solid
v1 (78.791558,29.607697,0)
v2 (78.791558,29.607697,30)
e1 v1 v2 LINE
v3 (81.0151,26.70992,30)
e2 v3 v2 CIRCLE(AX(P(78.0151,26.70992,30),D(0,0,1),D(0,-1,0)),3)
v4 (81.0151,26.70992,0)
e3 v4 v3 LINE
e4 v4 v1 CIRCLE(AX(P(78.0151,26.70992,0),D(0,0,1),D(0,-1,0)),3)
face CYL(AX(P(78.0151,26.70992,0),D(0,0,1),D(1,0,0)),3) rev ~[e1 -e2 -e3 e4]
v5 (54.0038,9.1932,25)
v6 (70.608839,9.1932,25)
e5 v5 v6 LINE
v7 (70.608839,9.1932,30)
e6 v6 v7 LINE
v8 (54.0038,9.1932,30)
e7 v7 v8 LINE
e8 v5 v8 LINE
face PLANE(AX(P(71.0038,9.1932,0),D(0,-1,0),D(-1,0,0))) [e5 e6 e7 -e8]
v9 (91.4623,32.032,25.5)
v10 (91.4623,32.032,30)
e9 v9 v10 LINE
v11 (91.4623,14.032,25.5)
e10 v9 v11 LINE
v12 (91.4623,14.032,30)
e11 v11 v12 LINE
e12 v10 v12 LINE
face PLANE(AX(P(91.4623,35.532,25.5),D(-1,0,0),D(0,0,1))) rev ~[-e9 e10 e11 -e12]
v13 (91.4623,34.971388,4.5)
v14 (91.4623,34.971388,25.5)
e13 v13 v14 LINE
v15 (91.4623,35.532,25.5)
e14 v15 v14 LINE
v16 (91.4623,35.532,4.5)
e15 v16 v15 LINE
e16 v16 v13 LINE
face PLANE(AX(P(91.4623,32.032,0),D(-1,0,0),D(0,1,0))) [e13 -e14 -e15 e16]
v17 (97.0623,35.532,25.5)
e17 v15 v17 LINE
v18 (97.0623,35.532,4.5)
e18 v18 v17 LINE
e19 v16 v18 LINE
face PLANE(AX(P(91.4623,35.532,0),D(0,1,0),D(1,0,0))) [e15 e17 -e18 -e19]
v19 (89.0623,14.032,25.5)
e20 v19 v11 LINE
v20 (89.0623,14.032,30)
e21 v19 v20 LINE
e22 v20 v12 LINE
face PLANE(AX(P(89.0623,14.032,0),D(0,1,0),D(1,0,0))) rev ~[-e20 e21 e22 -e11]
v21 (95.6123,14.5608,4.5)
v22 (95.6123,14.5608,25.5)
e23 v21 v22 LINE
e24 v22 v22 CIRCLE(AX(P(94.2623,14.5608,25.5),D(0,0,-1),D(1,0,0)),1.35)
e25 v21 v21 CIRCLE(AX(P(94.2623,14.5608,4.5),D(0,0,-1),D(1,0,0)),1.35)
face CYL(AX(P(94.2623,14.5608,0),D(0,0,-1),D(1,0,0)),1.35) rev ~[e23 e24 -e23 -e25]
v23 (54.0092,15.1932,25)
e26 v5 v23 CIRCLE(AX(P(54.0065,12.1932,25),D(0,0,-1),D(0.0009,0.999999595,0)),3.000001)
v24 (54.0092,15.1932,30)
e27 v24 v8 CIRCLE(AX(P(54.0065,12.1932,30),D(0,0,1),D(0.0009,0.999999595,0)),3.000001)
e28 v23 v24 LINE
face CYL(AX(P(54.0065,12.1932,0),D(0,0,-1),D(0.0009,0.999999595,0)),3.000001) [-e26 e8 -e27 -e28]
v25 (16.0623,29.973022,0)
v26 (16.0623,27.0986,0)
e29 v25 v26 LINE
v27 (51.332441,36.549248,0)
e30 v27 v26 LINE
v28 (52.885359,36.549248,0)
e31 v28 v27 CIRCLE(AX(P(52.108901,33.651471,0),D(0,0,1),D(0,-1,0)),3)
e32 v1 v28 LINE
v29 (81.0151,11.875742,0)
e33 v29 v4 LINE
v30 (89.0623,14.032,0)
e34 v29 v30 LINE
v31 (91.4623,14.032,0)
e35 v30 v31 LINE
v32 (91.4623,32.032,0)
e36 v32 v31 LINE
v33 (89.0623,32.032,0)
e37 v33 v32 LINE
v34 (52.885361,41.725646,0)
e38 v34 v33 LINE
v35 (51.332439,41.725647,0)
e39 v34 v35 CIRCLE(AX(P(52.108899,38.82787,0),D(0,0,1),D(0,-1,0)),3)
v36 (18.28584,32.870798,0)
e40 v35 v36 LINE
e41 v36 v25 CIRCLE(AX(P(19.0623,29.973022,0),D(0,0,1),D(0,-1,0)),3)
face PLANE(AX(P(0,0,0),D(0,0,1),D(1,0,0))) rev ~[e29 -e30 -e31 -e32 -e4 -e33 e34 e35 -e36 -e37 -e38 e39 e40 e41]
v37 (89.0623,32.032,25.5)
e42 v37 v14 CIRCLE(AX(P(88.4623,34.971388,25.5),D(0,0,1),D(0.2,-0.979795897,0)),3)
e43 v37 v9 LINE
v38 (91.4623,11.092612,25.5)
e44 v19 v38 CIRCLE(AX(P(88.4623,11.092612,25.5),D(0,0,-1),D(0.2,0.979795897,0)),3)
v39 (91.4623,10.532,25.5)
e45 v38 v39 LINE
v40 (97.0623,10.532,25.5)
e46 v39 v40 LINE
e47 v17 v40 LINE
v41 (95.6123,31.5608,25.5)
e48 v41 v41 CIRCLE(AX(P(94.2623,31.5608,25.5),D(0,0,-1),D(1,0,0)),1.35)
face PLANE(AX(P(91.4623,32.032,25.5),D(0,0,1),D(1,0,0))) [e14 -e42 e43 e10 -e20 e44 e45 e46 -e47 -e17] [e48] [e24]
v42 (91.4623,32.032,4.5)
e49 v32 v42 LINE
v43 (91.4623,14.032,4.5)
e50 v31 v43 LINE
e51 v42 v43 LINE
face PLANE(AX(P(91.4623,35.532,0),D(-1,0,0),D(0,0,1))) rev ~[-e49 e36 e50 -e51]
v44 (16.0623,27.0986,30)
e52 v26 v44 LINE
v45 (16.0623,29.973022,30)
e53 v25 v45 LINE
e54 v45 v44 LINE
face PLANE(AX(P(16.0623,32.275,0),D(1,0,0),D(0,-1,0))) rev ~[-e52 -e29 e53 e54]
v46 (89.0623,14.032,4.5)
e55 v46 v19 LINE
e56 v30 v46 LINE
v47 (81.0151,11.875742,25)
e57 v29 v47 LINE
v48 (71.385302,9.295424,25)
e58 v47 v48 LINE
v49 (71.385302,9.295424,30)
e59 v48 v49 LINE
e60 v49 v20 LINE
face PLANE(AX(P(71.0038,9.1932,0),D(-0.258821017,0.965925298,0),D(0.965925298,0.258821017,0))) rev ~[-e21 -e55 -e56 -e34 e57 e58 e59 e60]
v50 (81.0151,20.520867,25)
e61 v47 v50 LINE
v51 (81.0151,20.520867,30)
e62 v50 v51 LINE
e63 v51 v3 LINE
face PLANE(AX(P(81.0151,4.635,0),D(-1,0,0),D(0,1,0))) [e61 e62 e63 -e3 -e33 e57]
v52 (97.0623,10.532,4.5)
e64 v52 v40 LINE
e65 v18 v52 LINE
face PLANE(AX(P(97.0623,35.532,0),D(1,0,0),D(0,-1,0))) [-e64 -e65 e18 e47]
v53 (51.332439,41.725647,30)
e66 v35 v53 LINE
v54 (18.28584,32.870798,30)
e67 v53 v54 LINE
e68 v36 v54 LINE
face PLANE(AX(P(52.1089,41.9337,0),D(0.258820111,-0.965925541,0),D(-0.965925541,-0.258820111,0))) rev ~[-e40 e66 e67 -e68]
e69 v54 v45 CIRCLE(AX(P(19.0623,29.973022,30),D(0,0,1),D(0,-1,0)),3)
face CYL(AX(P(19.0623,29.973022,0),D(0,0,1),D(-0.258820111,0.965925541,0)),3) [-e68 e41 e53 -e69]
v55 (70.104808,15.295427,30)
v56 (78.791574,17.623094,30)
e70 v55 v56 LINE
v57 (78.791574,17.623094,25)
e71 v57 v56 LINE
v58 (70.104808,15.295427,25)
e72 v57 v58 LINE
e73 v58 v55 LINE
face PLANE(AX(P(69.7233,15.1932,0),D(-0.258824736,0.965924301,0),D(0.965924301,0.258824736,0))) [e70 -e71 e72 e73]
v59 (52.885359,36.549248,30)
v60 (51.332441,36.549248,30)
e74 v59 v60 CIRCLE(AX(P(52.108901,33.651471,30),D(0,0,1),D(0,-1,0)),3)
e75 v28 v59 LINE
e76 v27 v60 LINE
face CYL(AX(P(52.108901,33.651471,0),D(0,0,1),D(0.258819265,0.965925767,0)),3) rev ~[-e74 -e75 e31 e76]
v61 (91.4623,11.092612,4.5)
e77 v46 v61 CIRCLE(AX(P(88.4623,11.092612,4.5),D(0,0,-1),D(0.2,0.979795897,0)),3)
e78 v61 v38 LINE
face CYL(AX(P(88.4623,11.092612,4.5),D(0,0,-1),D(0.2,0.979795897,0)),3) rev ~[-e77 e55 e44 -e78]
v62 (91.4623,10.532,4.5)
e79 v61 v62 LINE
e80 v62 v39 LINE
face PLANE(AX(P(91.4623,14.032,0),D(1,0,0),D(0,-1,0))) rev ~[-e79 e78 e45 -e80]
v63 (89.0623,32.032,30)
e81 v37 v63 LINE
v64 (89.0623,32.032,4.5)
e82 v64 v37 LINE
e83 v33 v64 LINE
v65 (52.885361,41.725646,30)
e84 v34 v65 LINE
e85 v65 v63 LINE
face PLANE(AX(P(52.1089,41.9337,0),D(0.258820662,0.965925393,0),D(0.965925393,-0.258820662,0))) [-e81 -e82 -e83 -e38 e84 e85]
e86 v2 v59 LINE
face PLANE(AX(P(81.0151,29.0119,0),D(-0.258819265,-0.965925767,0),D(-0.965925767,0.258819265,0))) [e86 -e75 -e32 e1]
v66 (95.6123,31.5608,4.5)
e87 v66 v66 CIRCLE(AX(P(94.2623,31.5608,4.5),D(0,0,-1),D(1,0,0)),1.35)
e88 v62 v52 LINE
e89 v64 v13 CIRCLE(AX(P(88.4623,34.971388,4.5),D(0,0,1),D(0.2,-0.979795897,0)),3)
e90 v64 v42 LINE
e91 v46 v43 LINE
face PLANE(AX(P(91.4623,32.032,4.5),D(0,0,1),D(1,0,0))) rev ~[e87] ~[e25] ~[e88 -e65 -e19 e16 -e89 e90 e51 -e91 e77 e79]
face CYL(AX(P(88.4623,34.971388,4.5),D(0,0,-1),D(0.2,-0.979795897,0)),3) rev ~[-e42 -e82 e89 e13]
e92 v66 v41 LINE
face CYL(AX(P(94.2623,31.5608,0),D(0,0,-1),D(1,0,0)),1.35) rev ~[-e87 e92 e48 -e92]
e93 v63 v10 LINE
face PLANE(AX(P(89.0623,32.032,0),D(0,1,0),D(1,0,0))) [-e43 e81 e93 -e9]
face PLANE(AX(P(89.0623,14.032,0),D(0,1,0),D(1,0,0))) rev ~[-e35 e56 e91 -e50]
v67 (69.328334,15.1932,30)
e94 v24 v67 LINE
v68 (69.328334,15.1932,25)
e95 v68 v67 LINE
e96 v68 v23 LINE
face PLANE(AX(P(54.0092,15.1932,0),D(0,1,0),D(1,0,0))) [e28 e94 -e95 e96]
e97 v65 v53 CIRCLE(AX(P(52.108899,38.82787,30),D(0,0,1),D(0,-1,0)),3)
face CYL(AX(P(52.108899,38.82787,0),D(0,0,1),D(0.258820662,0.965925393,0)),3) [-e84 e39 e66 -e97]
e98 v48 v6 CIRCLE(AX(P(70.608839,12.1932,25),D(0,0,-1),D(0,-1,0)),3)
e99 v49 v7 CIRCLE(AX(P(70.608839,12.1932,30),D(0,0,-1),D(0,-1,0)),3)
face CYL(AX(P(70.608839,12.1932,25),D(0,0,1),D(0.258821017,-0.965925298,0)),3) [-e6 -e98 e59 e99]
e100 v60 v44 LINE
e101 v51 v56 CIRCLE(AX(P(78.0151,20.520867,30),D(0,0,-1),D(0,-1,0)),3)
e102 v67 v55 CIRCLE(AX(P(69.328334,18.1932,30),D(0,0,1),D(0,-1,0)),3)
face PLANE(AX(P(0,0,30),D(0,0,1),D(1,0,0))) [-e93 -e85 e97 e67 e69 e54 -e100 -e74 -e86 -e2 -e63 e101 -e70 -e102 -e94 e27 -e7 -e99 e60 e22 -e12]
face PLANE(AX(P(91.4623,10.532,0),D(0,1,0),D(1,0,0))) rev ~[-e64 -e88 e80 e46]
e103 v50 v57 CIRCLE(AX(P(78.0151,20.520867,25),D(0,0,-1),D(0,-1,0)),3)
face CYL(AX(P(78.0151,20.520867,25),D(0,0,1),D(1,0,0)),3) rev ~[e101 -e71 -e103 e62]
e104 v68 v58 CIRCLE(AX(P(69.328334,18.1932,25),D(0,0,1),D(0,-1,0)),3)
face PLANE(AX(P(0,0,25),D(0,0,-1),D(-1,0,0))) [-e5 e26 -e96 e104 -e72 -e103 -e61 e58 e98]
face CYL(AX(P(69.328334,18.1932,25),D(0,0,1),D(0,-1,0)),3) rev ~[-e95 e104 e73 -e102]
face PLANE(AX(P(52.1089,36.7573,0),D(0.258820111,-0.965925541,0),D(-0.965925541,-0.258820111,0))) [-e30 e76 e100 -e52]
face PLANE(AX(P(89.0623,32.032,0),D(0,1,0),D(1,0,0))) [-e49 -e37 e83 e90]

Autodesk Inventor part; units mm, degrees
ref_plane "YZ Plane" through (0, 0, 0) normal (1, 0, 0) x (0, 1, 0)
ref_plane "XZ Plane" through (0, 0, 0) normal (0, 1, 0) x (-1, 0, 0)
ref_plane "XY Plane" through (0, 0, 0) normal (0, 0, 1) x (1, 0, 0)
sketch "Sketch1" plane through (0, 0, 0) normal (0, 0, 1) x (1, 0, 0)
  line L0 (52.1089, 41.9337) -> (16.0623, 32.275)
  line L1 (81.0151, 18.2189) -> (81.0151, 29.0119)
  line L2 (81.0151, 29.0119) -> (52.1089, 36.7573)
  line L3 (52.1089, 36.7573) -> (16.0623, 27.0986)
  line L4 (16.0623, 32.275) -> (16.0623, 27.0986)
  line L5 (71.0038, 9.1932) -> (89.0623, 14.032)
  line L6 (71.0038, 9.1932) -> (54.0038, 9.1932)
  line L7 (54.0092, 15.1932) -> (69.7233, 15.1932)
  arc A0 (54.0092, 15.1932) -> (54.0038, 9.1932) centre (54.0065, 12.1932) ccw
  line L8 (69.7233, 15.1932) -> (81.0151, 18.2189)
  line L9 (52.1089, 41.9337) -> (89.0623, 32.032)
  line L10 (97.0623, 35.532) -> (97.0623, 10.532)
  circle A1 centre (94.2623, 31.5608) radius 1.35 projected
  circle A2 centre (94.2623, 14.5608) radius 1.35 projected
  line L11 (89.0623, 32.032) -> (91.4623, 32.032)
  line L12 (91.4623, 32.032) -> (91.4623, 35.532)
  line L13 (91.4623, 35.532) -> (97.0623, 35.532)
  line L14 (89.0623, 14.032) -> (91.4623, 14.032)
  line L15 (91.4623, 14.032) -> (91.4623, 10.532)
  line L16 (91.4623, 10.532) -> (97.0623, 10.532)
  point P0 (0, 0)
  dimension "d0" = 5
  dimension "d1" = 6
  dimension "d2" = 5
  dimension "d3" = 75
  dimension "d4" = 150
  dimension "d5" = 18
  dimension "d6" = 15
  dimension "d28" = 25
  dimension "d30" = 5.6
  dimension "d31" = 5.6
extrude "Extrusion1" add sketch "Sketch1" along normal blind 30
sketch "Sketch3" plane through (0, 0, 0) normal (0, 0, -1) x (-1, 0, 0)
  line L0 (-81.0151, 18.2189) -> (-46.6558, 18.2189)
  line L1 (-46.6558, 18.2189) -> (-46.6558, 4.635)
  line L2 (-46.6558, 4.635) -> (-81.0151, 4.635)
  line L3 (-81.0151, 4.635) -> (-81.0151, 18.2189)
  point P0 (0, 0)
extrude "Extrusion2" cut sketch "Sketch3" against normal blind 25
fillet "Fillet1" radius 3 7 edges at (81.0151, 29.0119, 15) (81.0151, 18.2189, 27.5) (69.7233, 15.1932, 27.5) (52.1089, 36.7573, 15) (52.1089, 41.9337, 15) (16.0623, 32.275, 15) (71.0038, 9.1932, 27.5)
sketch "Sketch6" plane through (91.4623, 35.532, 0) normal (0, 1, 0) x (1, 0, 0)
  line L0 (0, 0) -> (0, -30) projected
  line L1 (5.6, 0) -> (0, 0)
  line L2 (0, 0) -> (0, -4.5)
  line L3 (0, -4.5) -> (5.6, -4.5)
  line L4 (5.6, -4.5) -> (5.6, 0)
  line L5 (5.6, -30) -> (0, -30)
  line L6 (0, -30) -> (0, -25.5)
  line L7 (0, -25.5) -> (5.6, -25.5)
  line L8 (5.6, -25.5) -> (5.6, -30)
  point P0 (-91.4623, 0)
  dimension "d32" = 4.5
  dimension "d33" = 5.6
  dimension "d34" = 4.5
extrude "Extrusion5" cut sketch "Sketch6" against normal through all
fillet "Fillet2" radius 3 2 edges at (91.4623, 32.032, 15) (91.4623, 14.032, 15)
properties part number "Right Hand" material "Aluminum-6061"
